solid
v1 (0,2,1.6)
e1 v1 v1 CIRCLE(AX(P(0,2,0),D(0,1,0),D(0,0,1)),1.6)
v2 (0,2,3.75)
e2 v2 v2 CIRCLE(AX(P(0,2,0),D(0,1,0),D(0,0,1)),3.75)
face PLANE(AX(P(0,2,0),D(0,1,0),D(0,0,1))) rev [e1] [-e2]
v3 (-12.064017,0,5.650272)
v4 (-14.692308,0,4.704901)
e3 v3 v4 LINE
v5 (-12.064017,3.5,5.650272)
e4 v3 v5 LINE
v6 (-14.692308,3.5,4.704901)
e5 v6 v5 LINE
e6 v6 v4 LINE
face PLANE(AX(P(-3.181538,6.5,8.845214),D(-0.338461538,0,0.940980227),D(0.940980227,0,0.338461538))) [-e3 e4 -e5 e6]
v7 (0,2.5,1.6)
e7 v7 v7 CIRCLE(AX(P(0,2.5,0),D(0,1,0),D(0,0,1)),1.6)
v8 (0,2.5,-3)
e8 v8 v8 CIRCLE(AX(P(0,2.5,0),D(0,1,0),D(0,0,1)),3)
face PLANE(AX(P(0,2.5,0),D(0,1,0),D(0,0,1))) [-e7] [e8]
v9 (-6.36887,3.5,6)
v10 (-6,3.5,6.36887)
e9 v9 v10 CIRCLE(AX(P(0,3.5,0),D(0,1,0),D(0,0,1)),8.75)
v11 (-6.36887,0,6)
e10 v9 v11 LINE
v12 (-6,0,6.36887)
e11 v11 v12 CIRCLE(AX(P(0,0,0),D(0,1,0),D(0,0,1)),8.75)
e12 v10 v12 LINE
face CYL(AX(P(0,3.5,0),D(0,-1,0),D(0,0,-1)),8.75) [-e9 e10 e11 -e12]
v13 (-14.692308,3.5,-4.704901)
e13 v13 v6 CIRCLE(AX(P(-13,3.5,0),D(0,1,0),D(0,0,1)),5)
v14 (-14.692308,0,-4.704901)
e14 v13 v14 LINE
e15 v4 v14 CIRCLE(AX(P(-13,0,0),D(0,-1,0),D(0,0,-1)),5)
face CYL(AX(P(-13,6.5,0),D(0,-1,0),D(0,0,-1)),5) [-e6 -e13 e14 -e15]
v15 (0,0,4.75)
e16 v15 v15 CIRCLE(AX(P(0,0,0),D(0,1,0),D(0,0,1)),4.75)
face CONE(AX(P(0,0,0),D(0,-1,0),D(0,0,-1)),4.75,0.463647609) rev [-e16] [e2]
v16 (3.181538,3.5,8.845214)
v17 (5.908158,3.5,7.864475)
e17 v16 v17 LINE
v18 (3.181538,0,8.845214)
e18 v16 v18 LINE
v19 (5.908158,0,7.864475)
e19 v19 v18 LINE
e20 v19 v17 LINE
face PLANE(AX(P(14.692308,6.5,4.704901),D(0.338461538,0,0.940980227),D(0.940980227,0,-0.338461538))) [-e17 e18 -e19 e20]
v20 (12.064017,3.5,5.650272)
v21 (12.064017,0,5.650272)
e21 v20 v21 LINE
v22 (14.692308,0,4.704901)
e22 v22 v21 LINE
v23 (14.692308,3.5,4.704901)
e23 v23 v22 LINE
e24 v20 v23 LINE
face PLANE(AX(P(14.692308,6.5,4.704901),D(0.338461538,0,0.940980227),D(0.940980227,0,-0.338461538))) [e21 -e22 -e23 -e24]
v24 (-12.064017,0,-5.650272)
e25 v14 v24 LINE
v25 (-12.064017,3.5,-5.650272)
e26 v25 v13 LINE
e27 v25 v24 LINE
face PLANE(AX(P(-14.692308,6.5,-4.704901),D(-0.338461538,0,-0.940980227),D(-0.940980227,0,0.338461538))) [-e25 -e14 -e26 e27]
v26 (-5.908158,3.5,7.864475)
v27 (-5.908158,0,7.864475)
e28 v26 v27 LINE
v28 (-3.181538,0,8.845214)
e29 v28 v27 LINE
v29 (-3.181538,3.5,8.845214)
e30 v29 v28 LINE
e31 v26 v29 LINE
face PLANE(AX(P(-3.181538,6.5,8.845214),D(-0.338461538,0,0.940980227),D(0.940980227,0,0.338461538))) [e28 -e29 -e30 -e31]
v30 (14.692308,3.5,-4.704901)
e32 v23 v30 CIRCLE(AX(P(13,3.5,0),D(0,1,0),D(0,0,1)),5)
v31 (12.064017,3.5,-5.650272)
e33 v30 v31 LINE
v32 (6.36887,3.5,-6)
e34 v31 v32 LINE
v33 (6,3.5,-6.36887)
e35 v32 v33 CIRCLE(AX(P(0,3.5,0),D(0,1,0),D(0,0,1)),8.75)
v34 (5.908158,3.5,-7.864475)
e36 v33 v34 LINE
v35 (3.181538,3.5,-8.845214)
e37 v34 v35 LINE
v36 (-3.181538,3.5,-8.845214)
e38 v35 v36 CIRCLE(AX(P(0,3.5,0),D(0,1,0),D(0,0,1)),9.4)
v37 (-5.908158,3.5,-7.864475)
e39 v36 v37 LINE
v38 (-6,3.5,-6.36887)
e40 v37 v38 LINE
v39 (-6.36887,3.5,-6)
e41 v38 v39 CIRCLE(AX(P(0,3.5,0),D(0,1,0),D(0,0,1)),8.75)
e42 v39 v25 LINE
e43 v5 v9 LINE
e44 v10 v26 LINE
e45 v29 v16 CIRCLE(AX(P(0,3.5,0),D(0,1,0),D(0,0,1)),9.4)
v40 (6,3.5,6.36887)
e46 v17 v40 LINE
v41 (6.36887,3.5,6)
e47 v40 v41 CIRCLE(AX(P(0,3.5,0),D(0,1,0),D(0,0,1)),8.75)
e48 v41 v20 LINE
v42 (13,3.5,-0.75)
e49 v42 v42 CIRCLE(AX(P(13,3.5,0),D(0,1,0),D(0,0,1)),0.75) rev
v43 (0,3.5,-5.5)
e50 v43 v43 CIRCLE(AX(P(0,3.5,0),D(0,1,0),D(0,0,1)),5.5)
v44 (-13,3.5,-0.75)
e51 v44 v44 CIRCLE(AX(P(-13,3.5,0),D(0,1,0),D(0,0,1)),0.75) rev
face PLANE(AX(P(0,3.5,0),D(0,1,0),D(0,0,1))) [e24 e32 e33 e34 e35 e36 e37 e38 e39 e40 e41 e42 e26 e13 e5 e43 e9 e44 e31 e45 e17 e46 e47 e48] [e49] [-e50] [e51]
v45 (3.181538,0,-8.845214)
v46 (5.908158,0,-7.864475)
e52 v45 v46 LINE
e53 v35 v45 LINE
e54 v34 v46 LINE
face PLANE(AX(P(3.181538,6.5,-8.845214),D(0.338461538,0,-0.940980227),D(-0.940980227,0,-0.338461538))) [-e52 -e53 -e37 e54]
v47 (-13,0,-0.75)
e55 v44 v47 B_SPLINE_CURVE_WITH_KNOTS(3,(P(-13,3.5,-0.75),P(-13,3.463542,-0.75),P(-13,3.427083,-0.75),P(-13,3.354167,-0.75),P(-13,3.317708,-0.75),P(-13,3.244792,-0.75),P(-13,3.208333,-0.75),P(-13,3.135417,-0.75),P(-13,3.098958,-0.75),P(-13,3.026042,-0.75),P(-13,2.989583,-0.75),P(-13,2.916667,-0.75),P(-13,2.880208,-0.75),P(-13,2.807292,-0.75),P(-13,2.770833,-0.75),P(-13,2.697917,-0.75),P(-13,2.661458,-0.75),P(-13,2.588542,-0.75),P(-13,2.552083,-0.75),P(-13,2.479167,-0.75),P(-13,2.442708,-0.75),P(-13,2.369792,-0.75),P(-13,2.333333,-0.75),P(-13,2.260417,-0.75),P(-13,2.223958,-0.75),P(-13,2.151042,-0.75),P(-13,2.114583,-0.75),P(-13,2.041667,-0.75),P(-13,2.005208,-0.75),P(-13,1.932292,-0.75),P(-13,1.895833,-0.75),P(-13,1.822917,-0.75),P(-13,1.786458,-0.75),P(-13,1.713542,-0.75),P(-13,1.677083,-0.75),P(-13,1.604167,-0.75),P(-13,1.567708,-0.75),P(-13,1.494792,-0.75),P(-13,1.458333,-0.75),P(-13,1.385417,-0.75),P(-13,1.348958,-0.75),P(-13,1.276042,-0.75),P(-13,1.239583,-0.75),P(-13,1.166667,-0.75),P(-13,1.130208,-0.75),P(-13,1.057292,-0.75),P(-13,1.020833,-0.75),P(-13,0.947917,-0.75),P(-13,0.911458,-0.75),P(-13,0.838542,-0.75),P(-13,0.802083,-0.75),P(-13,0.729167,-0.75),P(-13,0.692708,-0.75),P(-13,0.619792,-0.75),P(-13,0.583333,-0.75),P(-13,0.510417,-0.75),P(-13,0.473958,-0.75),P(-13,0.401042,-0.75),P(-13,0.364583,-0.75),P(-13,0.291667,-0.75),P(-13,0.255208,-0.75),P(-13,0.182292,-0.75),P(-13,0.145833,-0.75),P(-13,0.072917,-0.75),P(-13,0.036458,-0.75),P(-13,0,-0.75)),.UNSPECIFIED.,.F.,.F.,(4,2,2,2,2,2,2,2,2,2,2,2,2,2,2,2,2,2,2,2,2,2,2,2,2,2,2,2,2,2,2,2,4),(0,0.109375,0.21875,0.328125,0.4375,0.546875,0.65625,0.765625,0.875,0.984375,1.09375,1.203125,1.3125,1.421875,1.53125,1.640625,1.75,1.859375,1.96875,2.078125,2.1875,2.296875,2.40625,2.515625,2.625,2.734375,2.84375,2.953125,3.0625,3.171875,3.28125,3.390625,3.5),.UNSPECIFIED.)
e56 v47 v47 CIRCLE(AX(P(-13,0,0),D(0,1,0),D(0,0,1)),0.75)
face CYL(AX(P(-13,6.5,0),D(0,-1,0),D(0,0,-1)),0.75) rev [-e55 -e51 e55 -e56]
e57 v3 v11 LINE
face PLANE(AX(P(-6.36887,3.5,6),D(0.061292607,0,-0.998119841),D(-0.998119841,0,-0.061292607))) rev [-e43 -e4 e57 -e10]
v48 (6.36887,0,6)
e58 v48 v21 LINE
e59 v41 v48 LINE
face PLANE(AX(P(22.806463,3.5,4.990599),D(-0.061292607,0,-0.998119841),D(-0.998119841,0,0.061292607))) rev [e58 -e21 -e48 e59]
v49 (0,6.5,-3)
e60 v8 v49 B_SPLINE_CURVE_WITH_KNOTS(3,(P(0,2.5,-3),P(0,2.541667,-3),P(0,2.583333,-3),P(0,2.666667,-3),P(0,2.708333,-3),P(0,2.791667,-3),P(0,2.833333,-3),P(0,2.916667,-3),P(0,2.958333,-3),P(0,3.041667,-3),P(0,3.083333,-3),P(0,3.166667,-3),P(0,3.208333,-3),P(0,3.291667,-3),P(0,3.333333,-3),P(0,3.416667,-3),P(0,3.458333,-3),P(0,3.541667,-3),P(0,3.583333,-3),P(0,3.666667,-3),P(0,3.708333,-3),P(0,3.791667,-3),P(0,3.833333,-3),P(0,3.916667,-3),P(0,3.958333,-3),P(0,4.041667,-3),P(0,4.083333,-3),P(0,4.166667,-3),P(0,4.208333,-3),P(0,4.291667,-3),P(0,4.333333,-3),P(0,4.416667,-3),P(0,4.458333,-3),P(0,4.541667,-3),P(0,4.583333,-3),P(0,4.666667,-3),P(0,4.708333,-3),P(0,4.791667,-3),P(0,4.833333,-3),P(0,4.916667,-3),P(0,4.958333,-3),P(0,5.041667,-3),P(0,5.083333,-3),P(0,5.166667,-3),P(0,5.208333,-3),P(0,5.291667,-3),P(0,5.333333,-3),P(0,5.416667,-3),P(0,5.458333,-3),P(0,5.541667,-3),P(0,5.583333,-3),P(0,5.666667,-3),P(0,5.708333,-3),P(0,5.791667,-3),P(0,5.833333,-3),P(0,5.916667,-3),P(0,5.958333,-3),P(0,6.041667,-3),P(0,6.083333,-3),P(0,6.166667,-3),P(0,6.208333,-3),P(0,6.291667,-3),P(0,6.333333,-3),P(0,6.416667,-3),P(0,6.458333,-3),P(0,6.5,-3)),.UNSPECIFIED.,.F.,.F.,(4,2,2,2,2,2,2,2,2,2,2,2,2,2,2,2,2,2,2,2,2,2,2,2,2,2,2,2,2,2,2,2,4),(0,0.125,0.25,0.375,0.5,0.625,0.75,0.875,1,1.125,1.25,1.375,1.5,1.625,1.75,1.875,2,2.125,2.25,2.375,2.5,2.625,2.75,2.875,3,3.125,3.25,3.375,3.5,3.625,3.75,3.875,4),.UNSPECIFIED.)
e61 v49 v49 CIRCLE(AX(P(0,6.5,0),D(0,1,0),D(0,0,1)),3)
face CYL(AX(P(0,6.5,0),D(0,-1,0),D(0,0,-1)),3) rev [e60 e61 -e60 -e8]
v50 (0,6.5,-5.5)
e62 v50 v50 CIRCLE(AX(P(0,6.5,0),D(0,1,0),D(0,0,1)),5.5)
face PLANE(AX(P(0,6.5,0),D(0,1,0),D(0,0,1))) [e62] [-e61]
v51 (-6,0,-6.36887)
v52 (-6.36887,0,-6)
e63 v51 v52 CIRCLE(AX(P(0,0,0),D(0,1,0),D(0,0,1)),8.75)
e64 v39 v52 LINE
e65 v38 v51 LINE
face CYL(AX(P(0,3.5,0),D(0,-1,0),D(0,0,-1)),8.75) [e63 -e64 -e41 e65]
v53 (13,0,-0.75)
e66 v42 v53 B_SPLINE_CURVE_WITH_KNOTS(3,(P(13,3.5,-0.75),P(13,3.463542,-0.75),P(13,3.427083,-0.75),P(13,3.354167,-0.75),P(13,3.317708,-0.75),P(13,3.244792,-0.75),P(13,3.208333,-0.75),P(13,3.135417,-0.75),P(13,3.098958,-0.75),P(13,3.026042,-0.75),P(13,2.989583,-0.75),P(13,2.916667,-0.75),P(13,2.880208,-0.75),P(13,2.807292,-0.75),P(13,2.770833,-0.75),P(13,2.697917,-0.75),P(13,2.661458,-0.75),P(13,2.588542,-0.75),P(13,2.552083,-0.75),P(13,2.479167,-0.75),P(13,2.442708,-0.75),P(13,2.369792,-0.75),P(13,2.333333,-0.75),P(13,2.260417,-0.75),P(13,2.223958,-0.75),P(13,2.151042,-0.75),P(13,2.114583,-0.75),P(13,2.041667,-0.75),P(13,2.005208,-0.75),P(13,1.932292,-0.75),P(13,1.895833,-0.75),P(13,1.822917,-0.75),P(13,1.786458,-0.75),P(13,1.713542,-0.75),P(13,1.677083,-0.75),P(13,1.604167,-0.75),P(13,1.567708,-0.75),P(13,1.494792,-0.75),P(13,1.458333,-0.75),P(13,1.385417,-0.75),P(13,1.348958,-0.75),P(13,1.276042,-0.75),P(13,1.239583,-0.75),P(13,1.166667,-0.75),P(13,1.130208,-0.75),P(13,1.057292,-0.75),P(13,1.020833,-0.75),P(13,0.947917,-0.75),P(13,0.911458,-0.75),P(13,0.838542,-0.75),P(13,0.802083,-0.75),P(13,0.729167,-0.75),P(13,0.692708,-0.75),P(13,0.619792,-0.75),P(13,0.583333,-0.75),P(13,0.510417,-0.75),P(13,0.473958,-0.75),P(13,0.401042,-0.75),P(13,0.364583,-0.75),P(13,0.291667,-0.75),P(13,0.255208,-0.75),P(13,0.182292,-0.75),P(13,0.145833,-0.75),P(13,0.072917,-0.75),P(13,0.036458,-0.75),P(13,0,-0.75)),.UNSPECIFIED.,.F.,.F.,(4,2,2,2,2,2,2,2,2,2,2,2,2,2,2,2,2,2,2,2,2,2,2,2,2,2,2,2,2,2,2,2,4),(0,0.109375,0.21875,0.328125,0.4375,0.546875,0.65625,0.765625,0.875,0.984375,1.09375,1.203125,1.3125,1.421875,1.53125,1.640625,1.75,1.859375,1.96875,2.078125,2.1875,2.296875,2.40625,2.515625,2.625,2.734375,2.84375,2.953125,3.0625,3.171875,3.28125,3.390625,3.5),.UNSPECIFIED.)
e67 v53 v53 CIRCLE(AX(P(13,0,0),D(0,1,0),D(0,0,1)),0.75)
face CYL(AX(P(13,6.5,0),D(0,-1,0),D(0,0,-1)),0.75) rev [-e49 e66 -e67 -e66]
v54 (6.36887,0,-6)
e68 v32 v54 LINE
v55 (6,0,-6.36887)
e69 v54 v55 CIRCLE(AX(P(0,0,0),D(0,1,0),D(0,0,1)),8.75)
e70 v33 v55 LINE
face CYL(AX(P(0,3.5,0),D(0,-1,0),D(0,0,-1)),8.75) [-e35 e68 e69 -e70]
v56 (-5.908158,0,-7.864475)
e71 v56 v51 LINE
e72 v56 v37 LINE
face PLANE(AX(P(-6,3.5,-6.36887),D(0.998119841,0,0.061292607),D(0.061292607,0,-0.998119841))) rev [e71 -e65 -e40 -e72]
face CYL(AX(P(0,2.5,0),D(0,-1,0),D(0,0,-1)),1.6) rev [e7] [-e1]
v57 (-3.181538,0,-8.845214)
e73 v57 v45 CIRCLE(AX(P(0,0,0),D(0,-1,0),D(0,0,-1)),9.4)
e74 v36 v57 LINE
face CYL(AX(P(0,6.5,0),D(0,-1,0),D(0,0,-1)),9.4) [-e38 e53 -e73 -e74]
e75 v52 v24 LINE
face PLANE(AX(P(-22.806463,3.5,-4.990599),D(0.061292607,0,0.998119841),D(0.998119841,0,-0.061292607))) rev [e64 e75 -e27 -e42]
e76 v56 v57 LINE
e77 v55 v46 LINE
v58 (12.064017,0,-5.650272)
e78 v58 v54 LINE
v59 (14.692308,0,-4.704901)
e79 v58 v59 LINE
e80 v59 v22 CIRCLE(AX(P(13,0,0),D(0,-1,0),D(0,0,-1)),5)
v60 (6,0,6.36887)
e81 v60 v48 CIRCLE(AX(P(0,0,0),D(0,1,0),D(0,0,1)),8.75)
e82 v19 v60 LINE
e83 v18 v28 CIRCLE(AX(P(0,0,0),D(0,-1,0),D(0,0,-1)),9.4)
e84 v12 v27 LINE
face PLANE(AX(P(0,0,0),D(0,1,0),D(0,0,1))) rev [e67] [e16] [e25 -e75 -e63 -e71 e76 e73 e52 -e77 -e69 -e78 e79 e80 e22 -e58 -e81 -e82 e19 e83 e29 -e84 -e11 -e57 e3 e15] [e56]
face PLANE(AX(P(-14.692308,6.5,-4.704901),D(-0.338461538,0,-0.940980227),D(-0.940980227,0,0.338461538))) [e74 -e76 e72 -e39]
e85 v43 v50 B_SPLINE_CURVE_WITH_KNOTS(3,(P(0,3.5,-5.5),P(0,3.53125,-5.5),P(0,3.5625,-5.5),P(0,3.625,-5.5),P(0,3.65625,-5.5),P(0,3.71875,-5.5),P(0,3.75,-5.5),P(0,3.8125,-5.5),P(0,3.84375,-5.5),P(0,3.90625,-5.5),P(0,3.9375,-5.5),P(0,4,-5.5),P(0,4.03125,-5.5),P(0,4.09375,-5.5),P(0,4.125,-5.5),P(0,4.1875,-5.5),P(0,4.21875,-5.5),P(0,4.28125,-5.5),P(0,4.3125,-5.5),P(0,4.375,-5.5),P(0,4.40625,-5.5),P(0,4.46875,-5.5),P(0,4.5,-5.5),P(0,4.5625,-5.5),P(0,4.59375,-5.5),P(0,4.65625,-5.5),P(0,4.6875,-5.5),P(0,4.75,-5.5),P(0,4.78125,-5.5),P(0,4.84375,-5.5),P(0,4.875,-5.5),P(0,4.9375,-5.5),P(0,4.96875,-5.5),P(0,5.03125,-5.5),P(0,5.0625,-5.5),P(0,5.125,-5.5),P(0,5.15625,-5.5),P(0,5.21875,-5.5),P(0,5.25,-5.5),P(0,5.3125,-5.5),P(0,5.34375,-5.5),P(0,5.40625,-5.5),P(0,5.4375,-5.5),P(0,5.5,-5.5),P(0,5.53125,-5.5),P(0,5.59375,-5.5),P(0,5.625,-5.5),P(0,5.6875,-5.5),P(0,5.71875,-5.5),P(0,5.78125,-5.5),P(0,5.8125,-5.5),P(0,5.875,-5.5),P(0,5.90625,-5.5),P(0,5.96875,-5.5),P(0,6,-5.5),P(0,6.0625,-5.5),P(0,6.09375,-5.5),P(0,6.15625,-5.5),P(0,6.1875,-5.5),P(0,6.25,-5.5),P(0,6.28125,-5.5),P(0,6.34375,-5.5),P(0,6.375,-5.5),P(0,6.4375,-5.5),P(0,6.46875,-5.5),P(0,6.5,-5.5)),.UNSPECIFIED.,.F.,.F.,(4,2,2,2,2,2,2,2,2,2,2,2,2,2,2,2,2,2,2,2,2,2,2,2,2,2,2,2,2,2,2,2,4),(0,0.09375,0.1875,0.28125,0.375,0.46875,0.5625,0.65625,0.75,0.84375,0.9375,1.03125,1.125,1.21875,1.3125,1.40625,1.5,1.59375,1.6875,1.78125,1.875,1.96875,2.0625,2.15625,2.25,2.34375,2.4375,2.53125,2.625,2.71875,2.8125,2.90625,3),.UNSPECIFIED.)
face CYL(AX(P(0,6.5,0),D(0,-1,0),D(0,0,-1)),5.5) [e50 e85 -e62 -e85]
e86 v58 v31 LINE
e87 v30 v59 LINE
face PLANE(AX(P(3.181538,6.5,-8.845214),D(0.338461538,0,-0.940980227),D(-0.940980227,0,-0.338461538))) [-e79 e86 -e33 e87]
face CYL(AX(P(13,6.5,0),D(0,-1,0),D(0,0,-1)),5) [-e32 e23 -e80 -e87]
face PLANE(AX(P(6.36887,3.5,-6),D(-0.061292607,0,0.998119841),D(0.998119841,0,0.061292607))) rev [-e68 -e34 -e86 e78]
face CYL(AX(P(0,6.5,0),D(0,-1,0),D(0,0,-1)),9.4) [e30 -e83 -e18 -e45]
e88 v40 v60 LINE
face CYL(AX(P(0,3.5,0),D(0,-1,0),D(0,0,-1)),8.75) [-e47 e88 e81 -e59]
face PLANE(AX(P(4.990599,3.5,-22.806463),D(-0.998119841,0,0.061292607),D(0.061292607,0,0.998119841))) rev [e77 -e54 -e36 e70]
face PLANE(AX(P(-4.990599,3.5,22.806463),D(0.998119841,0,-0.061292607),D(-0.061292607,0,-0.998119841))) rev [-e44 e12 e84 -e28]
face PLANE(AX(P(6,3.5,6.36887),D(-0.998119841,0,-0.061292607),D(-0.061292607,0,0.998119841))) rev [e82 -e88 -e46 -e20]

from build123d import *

# Parameters (mm, degrees)
SKETCH1_R           = 5.5
SKETCH1_R_2         = 3
BOSS_EXTRUDE1_DEPTH = 6.5
SKETCH2_R           = 3
BOSS_EXTRUDE2_DEPTH = 3.5
SKETCH4_R           = 3
SKETCH4_R_2         = 1.6
BOSS_EXTRUDE3_DEPTH = 2.5
SKETCH3_R           = 3.75
CUT_EXTRUDE2_DEPTH  = 2
CHAMFER1_SIZE2      = 2
CHAMFER1_SIZE       = 1
SKETCH5_R           = 0.75
CUT_EXTRUDE4_DEPTH  = 40.430318284
SKETCH6_OUTSIDE_W   = 72.61
SKETCH6_OUTSIDE_H   = 72.61
CUT_EXTRUDE5_DEPTH  = 40.430318284


with BuildPart() as part:
    # Sketch1 → Boss-Extrude1 (new body)
    with BuildSketch(Plane(origin=(0, 0, 0), x_dir=(1, 0, 0), z_dir=(0, 1, 0))):
        with Locations(Location((0, 0, 0), (0, 0, 90))):
            Circle(SKETCH1_R)
        with Locations(Location((0, 0, 0), (0, 0, 90))):
            Circle(SKETCH1_R_2, mode=Mode.SUBTRACT)
    extrude(amount=BOSS_EXTRUDE1_DEPTH)

    # Sketch2 → Boss-Extrude2 (add)
    with BuildSketch(Plane(origin=(0, 0, 0), x_dir=(1, 0, 0), z_dir=(0, 1, 0))):
        with BuildLine():
            Line((-6, 6.368869601), (-4.990599203, 22.806463037))
            ThreePointArc((-4.990599203, 22.806463037), (0, 27.5), (4.990599203, 22.806463037))
            Line((4.990599203, 22.806463037), (6, 6.368869601))
            ThreePointArc((6, 6.368869601), (6.187184335, 6.187184335), (6.368869601, 6))
            Line((6.368869601, 6), (22.806463037, 4.990599203))
            ThreePointArc((22.806463037, 4.990599203), (27.5, 0), (22.806463037, -4.990599203))
            Line((22.806463037, -4.990599203), (6.368869601, -6))
            ThreePointArc((6.368869601, -6), (6.187184335, -6.187184335), (6, -6.368869601))
            Line((6, -6.368869601), (4.990599203, -22.806463037))
            ThreePointArc((4.990599203, -22.806463037), (0, -27.5), (-4.990599203, -22.806463037))
            Line((-4.990599203, -22.806463037), (-6, -6.368869601))
            ThreePointArc((-6, -6.368869601), (-6.187184335, -6.187184335), (-6.368869601, -6))
            Line((-6.368869601, -6), (-22.806463037, -4.990599203))
            ThreePointArc((-22.806463037, -4.990599203), (-27.5, 0), (-22.806463037, 4.990599203))
            Line((-22.806463037, 4.990599203), (-6.368869601, 6))
            ThreePointArc((-6.368869601, 6), (-6.187184335, 6.187184335), (-6, 6.368869601))
        make_face()
        with Locations(Location((0, 0, 0), (0, 0, 90))):
            Circle(SKETCH2_R, mode=Mode.SUBTRACT)
    extrude(amount=BOSS_EXTRUDE2_DEPTH)

    # Sketch4 → Boss-Extrude3 (add)
    with BuildSketch(Plane(origin=(0, 0, 0), x_dir=(1, 0, 0), z_dir=(0, 1, 0))):
        with Locations(Location((0, 0, 0), (0, 0, 90))):
            Circle(SKETCH4_R)
        with Locations(Location((0, 0, 0), (0, 0, 270))):
            Circle(SKETCH4_R_2, mode=Mode.SUBTRACT)
    extrude(amount=BOSS_EXTRUDE3_DEPTH)

    # Sketch3 → Cut-Extrude2 (cut)
    with BuildSketch(Plane(origin=(0, 0, 0), x_dir=(1, 0, 0), z_dir=(0, 1, 0))):
        with Locations(Location((0, 0, 0), (0, 0, 270))):
            Circle(SKETCH3_R)
    extrude(amount=CUT_EXTRUDE2_DEPTH, mode=Mode.SUBTRACT)

    # Chamfer1
    chamfer1_edges = [part.edges().sort_by_distance(p)[0] for p in [
        (0, 0, -3.75),
    ]]
    chamfer1_side = [part.faces().sort_by_distance(p)[0] for p in [
        (0, 0, -3.77),
    ]]
    chamfer(chamfer1_edges, length=CHAMFER1_SIZE - 0.0001, length2=CHAMFER1_SIZE2 - 0.0001, reference=chamfer1_side[0])  # a hair under: the kernel refuses the full size

    # Sketch5 → Cut-Extrude4 (cut, through all)
    with BuildSketch(Plane(origin=(0, 0, 0), x_dir=(1, 0, 0), z_dir=(0, 1, 0))):
        with Locations(Location((0, 15, 0), (0, 0, 90))):
            Circle(SKETCH5_R)
        with Locations(Location((0, 21, 0), (0, 0, 90))):
            Circle(SKETCH5_R)
        with Locations(Location((13, 0, 0), (0, 0, 90))):
            Circle(SKETCH5_R)
        with Locations(Location((19, 0, 0), (0, 0, 90))):
            Circle(SKETCH5_R)
        with Locations(Location((25, 0, 0), (0, 0, 90))):
            Circle(SKETCH5_R)
        with Locations(Location((0, -21, 0), (0, 0, 90))):
            Circle(SKETCH5_R)
        with Locations(Location((0, -15, 0), (0, 0, 90))):
            Circle(SKETCH5_R)
        with Locations(Location((-13, 0, 0), (0, 0, 90))):
            Circle(SKETCH5_R)
        with Locations(Location((-19, 0, 0), (0, 0, 90))):
            Circle(SKETCH5_R)
        with Locations(Location((-25, 0, 0), (0, 0, 90))):
            Circle(SKETCH5_R)
    extrude(amount=CUT_EXTRUDE4_DEPTH, mode=Mode.SUBTRACT)

    # Sketch6 outside → Cut-Extrude5 (cut, through all)
    with BuildSketch(Plane.XZ):
        Rectangle(SKETCH6_OUTSIDE_W, SKETCH6_OUTSIDE_H)
        with BuildLine():
            Line((3.181538462, -8.845214131), (14.692307692, -4.704901133))
            ThreePointArc((14.692307692, -4.704901133), (18, 0), (14.692307692, 4.704901133))
            Line((14.692307692, 4.704901133), (3.181538462, 8.845214131))
            ThreePointArc((3.181538462, 8.845214131), (0, 9.4), (-3.181538462, 8.845214131))
            Line((-3.181538462, 8.845214131), (-14.692307692, 4.704901133))
            ThreePointArc((-14.692307692, 4.704901133), (-18, 0), (-14.692307692, -4.704901133))
            Line((-14.692307692, -4.704901133), (-3.181538462, -8.845214131))
            ThreePointArc((-3.181538462, -8.845214131), (0, -9.4), (3.181538462, -8.845214131))
        make_face(mode=Mode.SUBTRACT)
    extrude(amount=-CUT_EXTRUDE5_DEPTH, mode=Mode.SUBTRACT)


solid = part.part
